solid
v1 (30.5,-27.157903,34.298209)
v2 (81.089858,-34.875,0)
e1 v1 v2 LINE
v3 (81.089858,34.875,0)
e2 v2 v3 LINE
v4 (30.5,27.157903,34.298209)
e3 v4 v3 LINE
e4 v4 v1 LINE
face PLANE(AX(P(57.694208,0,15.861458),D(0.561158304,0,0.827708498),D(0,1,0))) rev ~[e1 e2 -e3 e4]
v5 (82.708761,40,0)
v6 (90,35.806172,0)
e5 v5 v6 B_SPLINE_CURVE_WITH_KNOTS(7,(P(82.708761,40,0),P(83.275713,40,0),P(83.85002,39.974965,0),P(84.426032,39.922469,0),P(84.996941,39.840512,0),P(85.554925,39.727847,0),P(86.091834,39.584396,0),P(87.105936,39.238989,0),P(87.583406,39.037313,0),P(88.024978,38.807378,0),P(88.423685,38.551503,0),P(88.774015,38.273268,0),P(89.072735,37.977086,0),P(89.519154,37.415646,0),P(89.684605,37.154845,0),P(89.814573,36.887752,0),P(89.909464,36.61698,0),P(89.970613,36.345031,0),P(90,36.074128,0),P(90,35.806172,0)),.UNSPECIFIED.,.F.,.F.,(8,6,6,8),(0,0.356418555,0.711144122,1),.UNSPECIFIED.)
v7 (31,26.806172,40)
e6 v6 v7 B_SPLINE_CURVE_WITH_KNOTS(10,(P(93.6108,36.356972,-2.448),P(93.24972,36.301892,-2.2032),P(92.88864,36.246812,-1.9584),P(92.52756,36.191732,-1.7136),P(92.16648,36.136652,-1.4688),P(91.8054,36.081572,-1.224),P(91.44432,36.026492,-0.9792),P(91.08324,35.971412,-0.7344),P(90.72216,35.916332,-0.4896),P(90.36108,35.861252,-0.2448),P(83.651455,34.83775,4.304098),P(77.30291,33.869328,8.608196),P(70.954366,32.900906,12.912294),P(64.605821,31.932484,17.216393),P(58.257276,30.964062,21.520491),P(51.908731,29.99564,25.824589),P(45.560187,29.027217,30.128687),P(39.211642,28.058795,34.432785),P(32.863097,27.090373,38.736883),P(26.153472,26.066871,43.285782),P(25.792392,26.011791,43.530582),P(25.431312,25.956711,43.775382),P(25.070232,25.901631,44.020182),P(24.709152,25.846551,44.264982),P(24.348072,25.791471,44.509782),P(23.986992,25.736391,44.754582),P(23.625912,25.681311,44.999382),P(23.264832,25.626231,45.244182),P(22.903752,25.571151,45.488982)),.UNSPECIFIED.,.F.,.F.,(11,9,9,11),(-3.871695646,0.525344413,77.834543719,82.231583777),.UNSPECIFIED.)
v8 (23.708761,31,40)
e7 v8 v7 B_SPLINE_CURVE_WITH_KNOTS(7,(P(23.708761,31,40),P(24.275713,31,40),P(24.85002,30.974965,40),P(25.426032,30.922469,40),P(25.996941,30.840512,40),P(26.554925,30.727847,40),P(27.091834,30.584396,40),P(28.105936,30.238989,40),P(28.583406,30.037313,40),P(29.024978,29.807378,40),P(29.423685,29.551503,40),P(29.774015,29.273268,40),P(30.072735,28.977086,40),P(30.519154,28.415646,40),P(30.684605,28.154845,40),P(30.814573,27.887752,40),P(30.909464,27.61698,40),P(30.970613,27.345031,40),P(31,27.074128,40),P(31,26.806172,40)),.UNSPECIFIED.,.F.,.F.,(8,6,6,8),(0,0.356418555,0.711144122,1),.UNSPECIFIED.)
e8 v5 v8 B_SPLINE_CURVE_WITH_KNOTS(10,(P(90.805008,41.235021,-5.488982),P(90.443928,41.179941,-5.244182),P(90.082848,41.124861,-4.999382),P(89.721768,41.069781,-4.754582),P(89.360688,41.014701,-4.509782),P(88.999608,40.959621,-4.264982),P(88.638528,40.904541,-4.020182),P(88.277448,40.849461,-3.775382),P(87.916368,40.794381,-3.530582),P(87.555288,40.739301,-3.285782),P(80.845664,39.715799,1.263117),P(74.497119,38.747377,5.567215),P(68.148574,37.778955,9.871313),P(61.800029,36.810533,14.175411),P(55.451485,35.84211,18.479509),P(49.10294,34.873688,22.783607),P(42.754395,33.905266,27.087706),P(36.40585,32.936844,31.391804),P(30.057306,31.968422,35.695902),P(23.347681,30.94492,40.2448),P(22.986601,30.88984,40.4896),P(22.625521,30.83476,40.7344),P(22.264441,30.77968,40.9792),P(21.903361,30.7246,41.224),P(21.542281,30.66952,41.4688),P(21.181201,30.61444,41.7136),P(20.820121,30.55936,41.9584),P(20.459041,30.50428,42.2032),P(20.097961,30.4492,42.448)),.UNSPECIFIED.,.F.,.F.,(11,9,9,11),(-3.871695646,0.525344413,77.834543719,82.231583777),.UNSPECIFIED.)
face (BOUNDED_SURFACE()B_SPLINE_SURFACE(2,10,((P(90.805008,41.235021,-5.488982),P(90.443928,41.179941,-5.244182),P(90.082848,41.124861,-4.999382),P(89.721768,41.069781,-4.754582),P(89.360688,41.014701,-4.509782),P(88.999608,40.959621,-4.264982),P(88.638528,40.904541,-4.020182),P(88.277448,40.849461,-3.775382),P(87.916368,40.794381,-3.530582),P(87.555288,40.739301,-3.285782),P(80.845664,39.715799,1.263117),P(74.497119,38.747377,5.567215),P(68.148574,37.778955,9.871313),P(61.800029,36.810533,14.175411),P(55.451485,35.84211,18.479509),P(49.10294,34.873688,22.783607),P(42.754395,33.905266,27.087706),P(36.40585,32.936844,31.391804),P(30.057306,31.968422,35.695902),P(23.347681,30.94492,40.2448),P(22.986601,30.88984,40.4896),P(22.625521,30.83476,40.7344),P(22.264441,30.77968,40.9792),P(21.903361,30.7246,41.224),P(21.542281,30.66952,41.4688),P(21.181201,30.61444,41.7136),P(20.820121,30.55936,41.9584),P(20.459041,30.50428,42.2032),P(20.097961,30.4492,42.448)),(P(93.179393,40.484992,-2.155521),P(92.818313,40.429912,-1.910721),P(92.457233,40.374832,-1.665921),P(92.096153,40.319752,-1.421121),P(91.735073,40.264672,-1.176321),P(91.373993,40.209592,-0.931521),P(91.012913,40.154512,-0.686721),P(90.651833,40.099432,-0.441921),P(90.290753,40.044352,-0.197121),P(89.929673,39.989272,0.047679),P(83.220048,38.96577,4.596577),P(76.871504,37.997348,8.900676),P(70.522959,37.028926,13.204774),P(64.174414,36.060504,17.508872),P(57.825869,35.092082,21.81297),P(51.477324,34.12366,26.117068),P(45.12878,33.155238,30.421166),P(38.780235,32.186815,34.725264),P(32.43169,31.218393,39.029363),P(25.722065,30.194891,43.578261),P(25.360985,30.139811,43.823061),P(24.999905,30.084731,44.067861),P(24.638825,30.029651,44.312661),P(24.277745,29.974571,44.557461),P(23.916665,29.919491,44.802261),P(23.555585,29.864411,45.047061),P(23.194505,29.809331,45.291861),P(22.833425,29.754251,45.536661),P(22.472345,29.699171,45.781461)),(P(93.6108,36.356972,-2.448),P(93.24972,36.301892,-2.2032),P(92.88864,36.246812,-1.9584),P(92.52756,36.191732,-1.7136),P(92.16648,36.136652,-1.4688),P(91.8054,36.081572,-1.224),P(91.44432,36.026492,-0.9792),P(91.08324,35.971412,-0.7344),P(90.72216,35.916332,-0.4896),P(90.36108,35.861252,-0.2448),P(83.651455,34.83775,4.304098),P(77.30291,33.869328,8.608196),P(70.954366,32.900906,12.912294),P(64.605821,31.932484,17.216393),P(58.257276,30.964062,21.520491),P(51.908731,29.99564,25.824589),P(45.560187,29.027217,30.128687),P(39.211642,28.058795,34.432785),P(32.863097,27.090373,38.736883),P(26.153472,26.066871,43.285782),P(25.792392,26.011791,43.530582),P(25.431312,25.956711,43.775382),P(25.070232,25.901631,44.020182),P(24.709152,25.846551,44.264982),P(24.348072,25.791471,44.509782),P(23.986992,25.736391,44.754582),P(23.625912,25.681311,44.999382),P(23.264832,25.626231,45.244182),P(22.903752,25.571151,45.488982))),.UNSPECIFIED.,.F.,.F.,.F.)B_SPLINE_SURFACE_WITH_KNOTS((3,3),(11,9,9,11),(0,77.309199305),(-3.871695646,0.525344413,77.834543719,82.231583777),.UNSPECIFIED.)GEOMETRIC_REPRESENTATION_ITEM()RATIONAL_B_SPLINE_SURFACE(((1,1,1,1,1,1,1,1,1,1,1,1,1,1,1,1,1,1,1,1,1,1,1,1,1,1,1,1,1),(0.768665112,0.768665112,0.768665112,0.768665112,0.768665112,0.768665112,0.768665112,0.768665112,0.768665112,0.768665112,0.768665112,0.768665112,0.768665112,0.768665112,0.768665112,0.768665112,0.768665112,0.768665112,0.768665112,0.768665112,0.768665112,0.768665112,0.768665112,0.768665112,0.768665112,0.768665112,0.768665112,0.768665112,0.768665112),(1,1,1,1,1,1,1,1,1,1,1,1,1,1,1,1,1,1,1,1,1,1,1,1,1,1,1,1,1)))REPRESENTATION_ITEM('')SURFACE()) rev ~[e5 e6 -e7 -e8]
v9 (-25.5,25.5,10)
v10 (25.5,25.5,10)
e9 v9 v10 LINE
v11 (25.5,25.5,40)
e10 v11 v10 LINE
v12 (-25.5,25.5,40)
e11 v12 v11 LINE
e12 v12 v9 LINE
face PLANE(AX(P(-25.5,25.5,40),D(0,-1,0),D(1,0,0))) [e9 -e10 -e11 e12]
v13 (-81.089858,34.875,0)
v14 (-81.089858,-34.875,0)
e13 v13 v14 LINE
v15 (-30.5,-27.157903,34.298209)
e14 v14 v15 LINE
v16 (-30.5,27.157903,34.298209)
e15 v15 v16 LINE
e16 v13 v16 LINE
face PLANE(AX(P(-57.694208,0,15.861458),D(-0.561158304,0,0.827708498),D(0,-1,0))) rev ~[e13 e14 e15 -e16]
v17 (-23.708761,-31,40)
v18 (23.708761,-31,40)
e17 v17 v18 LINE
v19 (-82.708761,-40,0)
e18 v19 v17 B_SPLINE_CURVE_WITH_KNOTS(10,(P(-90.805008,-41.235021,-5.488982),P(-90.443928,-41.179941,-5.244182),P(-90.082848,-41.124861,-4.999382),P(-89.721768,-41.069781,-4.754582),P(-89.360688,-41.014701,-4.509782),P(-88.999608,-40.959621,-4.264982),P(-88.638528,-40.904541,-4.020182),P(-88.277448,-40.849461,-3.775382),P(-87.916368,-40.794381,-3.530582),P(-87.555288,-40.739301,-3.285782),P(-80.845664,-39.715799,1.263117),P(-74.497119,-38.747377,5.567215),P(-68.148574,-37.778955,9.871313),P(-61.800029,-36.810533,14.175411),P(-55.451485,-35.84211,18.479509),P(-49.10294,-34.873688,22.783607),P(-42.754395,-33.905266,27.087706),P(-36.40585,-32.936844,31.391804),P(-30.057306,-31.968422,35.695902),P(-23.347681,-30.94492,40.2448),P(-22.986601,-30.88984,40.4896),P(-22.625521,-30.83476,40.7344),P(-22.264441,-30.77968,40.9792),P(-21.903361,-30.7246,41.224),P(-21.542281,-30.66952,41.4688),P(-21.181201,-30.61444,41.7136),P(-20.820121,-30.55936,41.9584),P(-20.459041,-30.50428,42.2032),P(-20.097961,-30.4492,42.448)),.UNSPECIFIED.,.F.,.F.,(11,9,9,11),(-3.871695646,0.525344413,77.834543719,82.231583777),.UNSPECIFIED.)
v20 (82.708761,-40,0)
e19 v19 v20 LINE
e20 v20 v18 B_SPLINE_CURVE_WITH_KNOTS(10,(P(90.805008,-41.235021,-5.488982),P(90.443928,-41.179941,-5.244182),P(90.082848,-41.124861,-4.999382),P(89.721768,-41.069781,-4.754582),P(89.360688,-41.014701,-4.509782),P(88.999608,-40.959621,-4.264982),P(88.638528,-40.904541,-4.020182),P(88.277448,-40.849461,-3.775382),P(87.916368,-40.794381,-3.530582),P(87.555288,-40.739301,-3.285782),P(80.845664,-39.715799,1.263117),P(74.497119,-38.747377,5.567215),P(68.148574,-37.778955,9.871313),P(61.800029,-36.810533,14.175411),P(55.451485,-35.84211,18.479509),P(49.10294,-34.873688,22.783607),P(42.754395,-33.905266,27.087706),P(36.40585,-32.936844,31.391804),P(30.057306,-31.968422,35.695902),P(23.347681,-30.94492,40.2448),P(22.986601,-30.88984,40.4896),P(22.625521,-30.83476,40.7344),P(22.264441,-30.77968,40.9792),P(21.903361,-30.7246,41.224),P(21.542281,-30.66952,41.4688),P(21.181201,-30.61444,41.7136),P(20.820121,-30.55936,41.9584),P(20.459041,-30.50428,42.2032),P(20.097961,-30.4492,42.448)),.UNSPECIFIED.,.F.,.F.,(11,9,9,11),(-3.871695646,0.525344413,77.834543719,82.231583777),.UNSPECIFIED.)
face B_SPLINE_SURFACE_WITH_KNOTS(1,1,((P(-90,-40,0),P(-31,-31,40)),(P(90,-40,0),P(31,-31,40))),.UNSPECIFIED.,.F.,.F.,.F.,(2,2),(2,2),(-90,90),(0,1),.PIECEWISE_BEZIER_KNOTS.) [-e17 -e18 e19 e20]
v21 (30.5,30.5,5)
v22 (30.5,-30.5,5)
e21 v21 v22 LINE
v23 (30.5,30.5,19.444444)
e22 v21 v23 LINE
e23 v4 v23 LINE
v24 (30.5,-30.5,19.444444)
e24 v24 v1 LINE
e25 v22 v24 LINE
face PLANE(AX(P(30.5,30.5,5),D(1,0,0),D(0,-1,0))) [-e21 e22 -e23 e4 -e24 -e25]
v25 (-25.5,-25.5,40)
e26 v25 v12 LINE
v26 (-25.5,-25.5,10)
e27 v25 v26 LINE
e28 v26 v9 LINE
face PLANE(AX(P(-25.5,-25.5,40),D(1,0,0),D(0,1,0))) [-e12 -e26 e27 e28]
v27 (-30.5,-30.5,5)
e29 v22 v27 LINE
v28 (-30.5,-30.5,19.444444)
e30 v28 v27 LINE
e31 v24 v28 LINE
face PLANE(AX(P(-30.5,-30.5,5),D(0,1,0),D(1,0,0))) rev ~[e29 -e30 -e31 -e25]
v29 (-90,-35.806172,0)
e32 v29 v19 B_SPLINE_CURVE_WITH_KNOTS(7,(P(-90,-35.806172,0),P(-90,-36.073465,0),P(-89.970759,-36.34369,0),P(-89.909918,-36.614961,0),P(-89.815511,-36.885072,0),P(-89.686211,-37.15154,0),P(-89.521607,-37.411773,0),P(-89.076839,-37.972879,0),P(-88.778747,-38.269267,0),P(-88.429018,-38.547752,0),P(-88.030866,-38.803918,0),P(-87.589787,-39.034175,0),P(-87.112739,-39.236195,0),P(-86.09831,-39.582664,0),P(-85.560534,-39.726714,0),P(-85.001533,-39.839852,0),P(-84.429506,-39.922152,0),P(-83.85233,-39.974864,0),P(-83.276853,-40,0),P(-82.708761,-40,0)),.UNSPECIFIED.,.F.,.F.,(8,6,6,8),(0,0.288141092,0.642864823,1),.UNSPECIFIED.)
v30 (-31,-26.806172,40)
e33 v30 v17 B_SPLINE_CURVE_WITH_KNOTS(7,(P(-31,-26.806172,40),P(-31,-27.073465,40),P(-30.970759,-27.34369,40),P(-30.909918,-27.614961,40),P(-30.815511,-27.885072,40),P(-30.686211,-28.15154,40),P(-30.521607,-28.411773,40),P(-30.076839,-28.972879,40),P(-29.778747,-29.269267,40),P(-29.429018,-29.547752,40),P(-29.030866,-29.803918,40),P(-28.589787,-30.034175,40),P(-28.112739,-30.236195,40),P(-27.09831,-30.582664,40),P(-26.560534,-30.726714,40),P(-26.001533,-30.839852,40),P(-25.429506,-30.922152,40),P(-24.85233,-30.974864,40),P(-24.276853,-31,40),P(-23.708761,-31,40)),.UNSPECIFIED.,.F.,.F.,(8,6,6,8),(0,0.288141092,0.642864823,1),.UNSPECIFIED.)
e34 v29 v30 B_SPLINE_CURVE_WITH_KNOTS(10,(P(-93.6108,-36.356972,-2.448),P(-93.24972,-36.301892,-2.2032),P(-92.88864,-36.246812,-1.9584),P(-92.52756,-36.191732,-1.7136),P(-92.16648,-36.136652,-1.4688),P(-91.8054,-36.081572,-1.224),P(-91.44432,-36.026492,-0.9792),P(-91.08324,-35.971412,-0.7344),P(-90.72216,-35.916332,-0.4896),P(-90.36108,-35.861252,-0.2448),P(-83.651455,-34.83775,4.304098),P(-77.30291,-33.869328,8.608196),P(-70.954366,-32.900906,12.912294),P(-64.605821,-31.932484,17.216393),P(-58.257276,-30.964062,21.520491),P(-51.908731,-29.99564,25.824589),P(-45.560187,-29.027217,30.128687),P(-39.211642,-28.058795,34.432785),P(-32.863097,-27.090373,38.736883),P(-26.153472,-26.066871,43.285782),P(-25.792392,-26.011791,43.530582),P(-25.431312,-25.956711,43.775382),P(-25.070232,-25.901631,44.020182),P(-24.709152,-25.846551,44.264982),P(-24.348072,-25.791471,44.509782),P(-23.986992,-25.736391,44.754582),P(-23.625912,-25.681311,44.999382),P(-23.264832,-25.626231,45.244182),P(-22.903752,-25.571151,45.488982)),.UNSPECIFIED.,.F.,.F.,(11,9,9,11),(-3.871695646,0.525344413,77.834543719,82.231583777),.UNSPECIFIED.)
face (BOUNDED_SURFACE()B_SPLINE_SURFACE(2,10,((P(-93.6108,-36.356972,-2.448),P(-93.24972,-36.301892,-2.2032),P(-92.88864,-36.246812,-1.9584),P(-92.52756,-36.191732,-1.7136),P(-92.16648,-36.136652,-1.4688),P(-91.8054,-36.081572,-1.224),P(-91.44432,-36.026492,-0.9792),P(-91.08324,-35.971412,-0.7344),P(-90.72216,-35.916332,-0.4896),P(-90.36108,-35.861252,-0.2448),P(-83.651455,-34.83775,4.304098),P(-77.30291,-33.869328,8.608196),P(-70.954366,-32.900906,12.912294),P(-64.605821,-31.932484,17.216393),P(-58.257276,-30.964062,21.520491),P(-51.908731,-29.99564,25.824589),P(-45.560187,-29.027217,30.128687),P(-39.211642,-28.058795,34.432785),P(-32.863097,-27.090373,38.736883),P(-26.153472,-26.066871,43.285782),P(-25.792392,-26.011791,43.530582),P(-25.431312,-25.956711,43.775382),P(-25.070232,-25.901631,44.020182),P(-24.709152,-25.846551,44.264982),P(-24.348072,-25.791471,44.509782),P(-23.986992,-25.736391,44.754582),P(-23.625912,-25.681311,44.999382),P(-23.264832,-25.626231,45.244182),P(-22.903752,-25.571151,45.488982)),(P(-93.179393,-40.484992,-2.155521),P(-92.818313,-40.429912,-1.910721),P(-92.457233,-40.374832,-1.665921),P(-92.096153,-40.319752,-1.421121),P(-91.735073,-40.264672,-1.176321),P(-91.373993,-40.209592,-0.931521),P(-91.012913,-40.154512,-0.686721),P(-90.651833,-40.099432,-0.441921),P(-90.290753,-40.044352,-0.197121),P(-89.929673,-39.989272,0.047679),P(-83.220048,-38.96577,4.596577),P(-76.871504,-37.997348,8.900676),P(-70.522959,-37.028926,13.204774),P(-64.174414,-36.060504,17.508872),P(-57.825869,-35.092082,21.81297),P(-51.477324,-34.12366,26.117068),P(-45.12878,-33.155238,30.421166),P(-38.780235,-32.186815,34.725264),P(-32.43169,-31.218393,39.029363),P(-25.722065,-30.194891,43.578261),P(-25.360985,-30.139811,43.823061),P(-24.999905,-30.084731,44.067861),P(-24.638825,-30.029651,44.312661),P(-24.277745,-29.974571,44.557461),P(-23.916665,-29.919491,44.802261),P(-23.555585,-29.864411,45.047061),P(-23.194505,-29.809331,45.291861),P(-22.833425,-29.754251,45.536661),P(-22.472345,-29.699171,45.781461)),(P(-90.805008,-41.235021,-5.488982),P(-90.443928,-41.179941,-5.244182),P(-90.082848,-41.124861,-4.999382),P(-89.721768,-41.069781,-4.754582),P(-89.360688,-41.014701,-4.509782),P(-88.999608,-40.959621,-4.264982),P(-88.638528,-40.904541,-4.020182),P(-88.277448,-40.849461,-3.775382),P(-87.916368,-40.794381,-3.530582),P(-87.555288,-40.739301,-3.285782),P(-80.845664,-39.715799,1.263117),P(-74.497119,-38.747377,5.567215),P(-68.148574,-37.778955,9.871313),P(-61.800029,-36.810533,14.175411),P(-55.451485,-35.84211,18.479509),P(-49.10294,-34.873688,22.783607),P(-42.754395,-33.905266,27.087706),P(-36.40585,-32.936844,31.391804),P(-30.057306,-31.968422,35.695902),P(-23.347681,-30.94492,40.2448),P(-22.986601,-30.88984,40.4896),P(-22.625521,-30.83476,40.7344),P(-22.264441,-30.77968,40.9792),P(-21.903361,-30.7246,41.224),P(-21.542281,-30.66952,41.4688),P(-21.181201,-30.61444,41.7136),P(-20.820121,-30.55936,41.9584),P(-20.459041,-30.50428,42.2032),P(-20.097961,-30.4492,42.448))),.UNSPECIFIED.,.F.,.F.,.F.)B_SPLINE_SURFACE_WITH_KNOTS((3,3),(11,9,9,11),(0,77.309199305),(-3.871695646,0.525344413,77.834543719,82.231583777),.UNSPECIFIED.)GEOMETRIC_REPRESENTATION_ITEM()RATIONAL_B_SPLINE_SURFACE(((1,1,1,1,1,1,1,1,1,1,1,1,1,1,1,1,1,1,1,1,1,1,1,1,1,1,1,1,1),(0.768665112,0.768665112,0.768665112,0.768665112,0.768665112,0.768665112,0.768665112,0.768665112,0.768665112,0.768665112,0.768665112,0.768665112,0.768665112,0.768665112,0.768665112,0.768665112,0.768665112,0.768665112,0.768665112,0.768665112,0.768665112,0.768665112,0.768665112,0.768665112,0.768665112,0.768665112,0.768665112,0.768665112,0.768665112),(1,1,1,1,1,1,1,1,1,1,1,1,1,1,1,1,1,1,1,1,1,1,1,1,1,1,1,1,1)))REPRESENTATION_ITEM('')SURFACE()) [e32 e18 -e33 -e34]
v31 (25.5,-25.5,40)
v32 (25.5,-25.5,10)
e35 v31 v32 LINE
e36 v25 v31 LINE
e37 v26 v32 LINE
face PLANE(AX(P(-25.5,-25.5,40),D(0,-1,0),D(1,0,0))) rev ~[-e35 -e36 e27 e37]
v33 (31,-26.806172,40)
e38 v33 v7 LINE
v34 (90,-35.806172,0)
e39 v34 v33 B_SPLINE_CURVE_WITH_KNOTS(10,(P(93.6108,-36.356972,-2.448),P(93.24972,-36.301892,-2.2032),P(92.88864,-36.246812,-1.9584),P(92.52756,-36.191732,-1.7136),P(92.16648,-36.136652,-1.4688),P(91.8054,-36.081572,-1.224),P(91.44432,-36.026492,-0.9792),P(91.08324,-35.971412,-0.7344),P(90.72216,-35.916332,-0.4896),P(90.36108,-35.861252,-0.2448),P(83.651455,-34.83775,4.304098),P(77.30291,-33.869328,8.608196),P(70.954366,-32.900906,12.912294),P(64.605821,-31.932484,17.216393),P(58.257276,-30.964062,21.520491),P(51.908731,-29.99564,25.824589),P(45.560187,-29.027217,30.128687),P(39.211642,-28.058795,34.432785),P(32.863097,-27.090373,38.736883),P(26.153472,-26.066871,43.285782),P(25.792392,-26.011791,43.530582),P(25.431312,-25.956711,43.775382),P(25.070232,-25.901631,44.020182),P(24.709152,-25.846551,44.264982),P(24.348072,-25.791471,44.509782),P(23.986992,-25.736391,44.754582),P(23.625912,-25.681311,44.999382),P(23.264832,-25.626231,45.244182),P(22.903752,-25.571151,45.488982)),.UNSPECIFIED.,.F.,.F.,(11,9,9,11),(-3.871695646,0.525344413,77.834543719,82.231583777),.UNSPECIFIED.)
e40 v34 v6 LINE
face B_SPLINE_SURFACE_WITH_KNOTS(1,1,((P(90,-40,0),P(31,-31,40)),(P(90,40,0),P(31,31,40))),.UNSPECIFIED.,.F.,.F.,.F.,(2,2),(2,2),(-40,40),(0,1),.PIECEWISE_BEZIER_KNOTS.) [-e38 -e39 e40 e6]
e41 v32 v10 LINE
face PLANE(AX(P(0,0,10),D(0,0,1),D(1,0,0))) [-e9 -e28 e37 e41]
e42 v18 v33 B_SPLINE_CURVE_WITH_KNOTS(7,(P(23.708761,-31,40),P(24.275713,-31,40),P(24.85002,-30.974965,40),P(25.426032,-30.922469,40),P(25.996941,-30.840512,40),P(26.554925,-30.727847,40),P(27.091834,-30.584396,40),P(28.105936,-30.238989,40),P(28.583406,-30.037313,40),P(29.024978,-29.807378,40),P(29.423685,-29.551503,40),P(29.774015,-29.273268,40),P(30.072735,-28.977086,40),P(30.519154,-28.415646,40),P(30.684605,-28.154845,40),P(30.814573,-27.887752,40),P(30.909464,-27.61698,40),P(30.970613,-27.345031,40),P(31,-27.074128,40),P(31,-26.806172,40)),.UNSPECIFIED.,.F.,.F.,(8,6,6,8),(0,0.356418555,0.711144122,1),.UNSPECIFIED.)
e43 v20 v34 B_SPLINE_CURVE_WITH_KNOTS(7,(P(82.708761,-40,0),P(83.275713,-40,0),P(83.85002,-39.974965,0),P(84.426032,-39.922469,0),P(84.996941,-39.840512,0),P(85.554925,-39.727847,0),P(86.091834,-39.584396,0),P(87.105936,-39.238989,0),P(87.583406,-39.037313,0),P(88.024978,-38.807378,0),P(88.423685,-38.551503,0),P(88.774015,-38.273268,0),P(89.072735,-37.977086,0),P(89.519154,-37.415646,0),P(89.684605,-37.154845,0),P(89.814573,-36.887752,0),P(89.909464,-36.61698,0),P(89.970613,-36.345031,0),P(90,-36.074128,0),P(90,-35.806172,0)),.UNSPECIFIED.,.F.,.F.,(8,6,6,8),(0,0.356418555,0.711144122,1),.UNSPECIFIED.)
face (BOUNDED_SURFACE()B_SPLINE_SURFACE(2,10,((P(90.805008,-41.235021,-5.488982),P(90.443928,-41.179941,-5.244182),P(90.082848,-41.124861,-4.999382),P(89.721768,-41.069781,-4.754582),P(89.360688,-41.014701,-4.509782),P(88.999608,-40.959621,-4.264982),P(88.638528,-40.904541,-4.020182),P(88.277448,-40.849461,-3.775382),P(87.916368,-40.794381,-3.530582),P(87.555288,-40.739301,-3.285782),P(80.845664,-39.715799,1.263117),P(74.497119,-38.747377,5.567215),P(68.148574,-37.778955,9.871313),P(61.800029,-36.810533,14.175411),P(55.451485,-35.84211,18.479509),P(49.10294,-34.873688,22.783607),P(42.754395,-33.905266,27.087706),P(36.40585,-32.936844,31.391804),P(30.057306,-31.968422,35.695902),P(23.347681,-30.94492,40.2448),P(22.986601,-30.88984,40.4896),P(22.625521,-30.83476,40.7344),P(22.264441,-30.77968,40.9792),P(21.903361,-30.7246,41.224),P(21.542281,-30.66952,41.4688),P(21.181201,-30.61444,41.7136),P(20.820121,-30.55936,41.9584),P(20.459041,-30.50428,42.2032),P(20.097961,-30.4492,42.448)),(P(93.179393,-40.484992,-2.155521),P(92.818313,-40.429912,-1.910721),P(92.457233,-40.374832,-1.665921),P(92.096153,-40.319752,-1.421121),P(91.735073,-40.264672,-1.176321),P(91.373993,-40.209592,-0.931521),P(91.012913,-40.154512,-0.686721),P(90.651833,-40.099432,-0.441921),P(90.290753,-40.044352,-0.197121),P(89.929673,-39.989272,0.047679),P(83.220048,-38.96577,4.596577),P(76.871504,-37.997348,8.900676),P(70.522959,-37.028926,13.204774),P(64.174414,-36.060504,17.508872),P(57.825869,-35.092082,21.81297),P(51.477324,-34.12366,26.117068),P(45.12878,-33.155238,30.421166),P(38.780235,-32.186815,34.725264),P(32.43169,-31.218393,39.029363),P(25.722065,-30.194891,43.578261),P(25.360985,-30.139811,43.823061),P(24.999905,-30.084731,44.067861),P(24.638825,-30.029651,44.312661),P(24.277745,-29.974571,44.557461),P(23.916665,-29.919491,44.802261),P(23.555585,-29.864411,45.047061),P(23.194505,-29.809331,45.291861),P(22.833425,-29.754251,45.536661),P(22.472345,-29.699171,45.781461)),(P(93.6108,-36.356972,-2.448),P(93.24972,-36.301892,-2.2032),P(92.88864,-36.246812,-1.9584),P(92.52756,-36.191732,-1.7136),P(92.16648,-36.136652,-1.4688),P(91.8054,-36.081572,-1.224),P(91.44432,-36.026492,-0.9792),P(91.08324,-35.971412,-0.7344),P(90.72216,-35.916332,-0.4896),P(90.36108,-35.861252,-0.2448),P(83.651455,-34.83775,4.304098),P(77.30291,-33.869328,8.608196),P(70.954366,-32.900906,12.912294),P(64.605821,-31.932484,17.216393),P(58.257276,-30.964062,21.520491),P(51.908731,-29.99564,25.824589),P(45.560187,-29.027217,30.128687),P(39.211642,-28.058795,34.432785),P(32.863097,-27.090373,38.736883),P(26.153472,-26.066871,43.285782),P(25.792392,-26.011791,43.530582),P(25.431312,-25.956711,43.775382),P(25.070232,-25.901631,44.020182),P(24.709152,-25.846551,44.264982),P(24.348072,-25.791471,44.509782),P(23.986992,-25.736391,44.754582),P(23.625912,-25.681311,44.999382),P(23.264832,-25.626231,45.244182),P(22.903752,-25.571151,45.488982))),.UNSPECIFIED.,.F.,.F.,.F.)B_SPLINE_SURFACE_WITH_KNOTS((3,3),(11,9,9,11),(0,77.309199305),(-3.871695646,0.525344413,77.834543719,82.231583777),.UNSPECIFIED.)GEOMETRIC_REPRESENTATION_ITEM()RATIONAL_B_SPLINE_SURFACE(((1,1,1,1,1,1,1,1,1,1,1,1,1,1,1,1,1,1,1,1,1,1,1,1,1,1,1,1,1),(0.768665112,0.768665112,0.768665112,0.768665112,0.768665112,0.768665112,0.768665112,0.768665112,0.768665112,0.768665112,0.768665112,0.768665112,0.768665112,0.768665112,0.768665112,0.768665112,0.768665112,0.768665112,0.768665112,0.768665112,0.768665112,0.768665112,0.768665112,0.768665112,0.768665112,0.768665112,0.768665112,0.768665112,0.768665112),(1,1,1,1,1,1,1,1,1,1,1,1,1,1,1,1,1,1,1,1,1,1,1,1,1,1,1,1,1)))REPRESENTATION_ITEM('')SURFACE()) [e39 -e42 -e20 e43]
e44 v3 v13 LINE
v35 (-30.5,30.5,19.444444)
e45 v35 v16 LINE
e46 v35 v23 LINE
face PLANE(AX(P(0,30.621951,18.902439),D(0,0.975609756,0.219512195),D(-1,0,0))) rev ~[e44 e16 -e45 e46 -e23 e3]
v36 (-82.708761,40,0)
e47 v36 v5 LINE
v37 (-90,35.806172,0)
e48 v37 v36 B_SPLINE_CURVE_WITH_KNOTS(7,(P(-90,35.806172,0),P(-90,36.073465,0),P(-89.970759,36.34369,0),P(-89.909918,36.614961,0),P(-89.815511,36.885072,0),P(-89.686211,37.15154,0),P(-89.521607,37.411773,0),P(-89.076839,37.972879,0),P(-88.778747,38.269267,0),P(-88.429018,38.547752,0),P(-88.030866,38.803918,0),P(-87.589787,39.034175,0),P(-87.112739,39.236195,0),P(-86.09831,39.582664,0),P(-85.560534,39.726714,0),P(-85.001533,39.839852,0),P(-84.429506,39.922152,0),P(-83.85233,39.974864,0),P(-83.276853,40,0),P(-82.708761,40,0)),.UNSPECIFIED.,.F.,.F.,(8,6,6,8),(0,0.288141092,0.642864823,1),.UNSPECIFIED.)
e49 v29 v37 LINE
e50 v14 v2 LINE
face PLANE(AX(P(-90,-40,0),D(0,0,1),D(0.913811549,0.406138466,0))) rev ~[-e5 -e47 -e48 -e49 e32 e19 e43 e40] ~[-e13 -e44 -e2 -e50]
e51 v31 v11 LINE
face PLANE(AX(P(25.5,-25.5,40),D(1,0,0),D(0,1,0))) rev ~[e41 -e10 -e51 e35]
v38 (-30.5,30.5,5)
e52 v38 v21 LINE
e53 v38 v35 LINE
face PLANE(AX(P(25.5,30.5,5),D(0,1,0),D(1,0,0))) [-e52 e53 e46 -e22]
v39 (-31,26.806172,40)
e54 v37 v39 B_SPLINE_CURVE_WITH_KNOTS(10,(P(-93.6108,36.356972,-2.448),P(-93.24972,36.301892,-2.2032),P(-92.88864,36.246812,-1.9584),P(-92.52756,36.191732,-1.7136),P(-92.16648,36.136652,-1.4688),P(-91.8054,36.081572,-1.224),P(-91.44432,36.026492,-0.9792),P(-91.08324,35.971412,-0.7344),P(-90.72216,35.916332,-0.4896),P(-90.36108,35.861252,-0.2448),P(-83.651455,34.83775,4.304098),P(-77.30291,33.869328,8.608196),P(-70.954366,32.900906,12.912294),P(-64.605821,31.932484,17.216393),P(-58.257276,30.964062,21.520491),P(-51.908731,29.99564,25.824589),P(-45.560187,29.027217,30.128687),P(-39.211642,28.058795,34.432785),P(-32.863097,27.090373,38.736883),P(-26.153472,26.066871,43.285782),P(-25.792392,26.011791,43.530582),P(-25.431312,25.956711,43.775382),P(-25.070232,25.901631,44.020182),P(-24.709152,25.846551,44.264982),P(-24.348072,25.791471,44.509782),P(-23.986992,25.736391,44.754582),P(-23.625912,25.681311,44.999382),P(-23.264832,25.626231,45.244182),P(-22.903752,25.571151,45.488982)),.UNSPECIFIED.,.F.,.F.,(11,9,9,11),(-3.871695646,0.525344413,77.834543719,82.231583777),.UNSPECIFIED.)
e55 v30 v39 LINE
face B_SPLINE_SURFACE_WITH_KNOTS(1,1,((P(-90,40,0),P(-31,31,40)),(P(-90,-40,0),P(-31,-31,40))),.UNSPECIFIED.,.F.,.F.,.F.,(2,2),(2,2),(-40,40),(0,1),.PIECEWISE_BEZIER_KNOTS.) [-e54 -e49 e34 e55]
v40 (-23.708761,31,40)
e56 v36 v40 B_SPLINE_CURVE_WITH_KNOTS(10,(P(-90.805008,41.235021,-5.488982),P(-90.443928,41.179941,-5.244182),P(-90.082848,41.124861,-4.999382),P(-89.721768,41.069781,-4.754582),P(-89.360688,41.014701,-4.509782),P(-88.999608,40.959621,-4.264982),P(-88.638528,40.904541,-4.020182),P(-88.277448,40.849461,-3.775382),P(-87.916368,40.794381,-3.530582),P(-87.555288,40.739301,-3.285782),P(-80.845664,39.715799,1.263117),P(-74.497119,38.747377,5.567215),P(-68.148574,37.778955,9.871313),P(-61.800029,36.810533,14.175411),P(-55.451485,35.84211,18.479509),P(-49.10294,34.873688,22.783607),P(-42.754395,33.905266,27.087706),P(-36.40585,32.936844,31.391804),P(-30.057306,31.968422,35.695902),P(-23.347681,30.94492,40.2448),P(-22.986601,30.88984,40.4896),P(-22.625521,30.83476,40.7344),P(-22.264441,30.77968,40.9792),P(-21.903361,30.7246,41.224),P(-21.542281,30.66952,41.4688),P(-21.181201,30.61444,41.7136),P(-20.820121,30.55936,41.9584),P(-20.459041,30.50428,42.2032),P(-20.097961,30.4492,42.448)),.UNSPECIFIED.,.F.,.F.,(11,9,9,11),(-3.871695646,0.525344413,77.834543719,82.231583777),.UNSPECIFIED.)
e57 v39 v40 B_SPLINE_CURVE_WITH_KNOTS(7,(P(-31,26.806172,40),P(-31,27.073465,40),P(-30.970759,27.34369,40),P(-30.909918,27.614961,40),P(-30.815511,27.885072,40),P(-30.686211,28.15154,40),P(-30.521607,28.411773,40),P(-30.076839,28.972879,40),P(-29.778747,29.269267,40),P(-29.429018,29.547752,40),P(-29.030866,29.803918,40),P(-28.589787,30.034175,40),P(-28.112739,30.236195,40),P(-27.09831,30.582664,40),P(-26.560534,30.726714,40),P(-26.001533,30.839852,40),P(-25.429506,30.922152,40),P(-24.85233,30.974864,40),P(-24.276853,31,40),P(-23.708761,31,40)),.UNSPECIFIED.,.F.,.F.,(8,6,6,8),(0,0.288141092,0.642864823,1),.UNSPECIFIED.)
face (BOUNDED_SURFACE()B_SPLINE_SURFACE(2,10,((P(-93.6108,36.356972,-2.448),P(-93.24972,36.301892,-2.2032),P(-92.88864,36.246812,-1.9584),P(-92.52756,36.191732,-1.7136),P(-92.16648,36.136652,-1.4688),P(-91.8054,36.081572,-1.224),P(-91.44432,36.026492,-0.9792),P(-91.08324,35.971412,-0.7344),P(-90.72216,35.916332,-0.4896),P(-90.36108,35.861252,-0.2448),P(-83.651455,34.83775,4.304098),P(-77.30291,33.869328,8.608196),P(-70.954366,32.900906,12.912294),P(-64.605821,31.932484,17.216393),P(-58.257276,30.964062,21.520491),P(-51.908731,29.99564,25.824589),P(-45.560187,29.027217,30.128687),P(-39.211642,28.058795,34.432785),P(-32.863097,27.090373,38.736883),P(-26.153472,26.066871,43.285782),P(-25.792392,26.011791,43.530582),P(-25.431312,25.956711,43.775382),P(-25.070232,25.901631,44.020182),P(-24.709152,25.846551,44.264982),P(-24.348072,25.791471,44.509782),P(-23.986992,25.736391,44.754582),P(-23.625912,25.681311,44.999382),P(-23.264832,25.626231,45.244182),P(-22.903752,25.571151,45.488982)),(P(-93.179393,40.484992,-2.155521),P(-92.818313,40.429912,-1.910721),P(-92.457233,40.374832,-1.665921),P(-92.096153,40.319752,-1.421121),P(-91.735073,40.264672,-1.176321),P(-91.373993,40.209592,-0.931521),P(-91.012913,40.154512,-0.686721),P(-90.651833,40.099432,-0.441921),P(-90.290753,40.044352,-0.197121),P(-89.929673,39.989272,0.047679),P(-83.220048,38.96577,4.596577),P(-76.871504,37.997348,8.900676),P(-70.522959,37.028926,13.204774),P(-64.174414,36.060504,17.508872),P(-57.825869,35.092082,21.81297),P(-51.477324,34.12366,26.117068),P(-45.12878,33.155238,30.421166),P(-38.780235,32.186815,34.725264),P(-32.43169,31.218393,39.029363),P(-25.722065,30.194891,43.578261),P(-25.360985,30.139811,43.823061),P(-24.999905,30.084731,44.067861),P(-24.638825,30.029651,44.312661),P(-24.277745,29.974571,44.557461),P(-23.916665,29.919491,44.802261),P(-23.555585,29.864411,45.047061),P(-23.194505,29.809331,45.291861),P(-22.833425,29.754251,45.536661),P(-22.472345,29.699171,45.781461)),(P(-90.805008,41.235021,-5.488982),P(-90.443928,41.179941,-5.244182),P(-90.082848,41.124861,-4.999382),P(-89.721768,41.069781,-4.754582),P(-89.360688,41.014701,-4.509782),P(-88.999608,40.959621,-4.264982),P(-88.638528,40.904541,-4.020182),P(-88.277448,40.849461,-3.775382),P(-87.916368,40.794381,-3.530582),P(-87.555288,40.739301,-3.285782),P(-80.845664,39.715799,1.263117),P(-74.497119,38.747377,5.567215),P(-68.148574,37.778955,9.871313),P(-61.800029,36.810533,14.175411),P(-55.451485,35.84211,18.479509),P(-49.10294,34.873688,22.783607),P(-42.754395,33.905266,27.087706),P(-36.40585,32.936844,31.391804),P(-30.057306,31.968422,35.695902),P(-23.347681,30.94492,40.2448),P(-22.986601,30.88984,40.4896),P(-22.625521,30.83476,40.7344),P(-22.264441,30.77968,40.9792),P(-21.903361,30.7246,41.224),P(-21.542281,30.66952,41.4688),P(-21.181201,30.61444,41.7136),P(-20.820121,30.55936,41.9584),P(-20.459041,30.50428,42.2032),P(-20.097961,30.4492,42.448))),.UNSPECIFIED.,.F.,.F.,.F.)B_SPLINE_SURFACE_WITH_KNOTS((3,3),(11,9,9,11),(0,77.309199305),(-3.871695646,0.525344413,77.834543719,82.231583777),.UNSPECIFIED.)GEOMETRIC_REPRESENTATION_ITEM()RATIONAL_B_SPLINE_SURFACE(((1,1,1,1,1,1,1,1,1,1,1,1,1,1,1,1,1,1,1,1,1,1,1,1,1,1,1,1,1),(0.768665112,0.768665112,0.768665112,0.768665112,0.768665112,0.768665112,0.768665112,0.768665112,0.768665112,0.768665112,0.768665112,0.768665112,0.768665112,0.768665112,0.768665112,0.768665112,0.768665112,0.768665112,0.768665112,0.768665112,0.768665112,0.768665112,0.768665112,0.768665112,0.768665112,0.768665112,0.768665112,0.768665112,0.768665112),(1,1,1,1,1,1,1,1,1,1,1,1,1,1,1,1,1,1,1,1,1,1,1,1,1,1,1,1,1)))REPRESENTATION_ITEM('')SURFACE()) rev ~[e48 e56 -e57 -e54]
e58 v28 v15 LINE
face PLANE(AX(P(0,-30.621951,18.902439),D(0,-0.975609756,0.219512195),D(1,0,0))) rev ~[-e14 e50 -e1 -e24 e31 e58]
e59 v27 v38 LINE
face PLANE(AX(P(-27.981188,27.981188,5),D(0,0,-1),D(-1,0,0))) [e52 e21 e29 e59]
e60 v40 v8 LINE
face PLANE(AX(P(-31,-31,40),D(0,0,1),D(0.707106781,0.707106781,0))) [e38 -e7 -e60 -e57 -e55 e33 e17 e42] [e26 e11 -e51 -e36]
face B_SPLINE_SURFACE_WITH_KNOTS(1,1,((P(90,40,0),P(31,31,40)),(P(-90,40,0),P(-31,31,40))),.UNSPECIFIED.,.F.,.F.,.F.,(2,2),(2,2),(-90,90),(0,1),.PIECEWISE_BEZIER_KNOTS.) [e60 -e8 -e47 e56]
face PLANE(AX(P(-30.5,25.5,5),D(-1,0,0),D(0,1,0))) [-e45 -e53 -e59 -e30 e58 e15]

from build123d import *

# Parameters (mm, degrees)
F0_W        = 180
F0_H        = 80
F2_W        = 62
F2_H        = 62
F4_W        = 51
F4_H        = 51
F5_DEPTH    = 30
F6_T        = 5
F6_T3_DEPTH = 40
F6_T5_DEPTH = 61
F6_T7_DEPTH = 61
F7_R        = 5


# Not quite as in the source:
# - a shell that OpenCascade refuses in one call is made with other operations: the cavity is built on its own and cut out


with BuildPart() as f3:
    # F0 (on Top) → F3 section 0
    with BuildSketch(Plane.XY):
        Rectangle(F0_W, F0_H)
    # F2 (on offset) → F3 section 1
    with BuildSketch(Plane.XY.offset(40)):
        Rectangle(F2_W, F2_H)
    loft()

    # F4 (on face) → F5 (cut)
    with BuildSketch(Plane.XY.offset(40)):
        Rectangle(F4_W, F4_H)
    extrude(amount=-F5_DEPTH, mode=Mode.SUBTRACT)

    # F6: shell of thickness 5, made by hand


with BuildPart() as f6_core1:
    # F6_t2: copy of F3
    add(f3.part)

    # the walls: a layer under each face that stays
    f6_faces = [f6_core1.faces().sort_by_distance(p)[0] for p in [
        (0, 35.5, 20),
        (-60.5, 0, 20),
        (26.5714285714, 26.5714285714, 40),
        (60.5, 0, 20),
        (0, -35.5, 20),
        (-25.5, 0, 25),
        (0, 25.5, 25),
        (25.5, 0, 25),
        (0, -25.5, 25),
        (0, 0, 10),
    ]]
    thicken(f6_faces, amount=-F6_T, mode=Mode.SUBTRACT)

    # F6_s4 → F6_t3 (cut)
    with BuildSketch(Plane.XY.offset(5)):
        Polygon((-25.45, 25.45), (-30.5, 25.5), (-30.5, 30.5), (-25.5, 30.5), align=None)
        Polygon((-25.45, -25.45), (-30.5, -25.5), (-30.5, -30.5), (-25.5, -30.5), align=None)
        Polygon((25.45, 25.45), (25.5, 30.5), (30.5, 30.5), (30.5, 25.5), align=None)
        Polygon((25.45, -25.45), (30.5, -25.5), (30.5, -30.5), (25.5, -30.5), align=None)
    extrude(amount=F6_T3_DEPTH, mode=Mode.SUBTRACT)

    # F6_s6 → F6_t5 (cut)
    with BuildSketch(Plane.XZ.offset(-30.5)):
        Polygon((-25.45, 10.05), (-30.5, 10), (-30.5, 5), (-25.5, 5), align=None)
        Polygon((25.45, 10.05), (30.5, 10), (30.5, 5), (25.5, 5), align=None)
    extrude(amount=F6_T5_DEPTH, mode=Mode.SUBTRACT)

    # F6_s8 → F6_t7 (cut)
    with BuildSketch(Plane.YZ.offset(-30.5)):
        Polygon((25.45, 10.05), (30.5, 10), (30.5, 5), (25.5, 5), align=None)
        Polygon((-25.45, 10.05), (-30.5, 10), (-30.5, 5), (-25.5, 5), align=None)
    extrude(amount=F6_T7_DEPTH, mode=Mode.SUBTRACT)


with BuildPart() as f3_1:
    add(f3.part)

    # what is left inside the walls is the cavity
    f6_cavity = [f6_core1.part.solids().sort_by_distance(p)[0] for p in [
        (8.772982, -19.739209, 0.05),
    ]]
    add(f6_cavity, mode=Mode.SUBTRACT)

    # F7
    f7_edges = [f3_1.edges().sort_by_distance(p)[0] for p in [
        (60.5, -35.5, 20),
        (60.5, 35.5, 20),
        (-60.5, 35.5, 20),
        (-60.5, -35.5, 20),
    ]]
    fillet(f7_edges, radius=F7_R)


solid = f3_1.part
